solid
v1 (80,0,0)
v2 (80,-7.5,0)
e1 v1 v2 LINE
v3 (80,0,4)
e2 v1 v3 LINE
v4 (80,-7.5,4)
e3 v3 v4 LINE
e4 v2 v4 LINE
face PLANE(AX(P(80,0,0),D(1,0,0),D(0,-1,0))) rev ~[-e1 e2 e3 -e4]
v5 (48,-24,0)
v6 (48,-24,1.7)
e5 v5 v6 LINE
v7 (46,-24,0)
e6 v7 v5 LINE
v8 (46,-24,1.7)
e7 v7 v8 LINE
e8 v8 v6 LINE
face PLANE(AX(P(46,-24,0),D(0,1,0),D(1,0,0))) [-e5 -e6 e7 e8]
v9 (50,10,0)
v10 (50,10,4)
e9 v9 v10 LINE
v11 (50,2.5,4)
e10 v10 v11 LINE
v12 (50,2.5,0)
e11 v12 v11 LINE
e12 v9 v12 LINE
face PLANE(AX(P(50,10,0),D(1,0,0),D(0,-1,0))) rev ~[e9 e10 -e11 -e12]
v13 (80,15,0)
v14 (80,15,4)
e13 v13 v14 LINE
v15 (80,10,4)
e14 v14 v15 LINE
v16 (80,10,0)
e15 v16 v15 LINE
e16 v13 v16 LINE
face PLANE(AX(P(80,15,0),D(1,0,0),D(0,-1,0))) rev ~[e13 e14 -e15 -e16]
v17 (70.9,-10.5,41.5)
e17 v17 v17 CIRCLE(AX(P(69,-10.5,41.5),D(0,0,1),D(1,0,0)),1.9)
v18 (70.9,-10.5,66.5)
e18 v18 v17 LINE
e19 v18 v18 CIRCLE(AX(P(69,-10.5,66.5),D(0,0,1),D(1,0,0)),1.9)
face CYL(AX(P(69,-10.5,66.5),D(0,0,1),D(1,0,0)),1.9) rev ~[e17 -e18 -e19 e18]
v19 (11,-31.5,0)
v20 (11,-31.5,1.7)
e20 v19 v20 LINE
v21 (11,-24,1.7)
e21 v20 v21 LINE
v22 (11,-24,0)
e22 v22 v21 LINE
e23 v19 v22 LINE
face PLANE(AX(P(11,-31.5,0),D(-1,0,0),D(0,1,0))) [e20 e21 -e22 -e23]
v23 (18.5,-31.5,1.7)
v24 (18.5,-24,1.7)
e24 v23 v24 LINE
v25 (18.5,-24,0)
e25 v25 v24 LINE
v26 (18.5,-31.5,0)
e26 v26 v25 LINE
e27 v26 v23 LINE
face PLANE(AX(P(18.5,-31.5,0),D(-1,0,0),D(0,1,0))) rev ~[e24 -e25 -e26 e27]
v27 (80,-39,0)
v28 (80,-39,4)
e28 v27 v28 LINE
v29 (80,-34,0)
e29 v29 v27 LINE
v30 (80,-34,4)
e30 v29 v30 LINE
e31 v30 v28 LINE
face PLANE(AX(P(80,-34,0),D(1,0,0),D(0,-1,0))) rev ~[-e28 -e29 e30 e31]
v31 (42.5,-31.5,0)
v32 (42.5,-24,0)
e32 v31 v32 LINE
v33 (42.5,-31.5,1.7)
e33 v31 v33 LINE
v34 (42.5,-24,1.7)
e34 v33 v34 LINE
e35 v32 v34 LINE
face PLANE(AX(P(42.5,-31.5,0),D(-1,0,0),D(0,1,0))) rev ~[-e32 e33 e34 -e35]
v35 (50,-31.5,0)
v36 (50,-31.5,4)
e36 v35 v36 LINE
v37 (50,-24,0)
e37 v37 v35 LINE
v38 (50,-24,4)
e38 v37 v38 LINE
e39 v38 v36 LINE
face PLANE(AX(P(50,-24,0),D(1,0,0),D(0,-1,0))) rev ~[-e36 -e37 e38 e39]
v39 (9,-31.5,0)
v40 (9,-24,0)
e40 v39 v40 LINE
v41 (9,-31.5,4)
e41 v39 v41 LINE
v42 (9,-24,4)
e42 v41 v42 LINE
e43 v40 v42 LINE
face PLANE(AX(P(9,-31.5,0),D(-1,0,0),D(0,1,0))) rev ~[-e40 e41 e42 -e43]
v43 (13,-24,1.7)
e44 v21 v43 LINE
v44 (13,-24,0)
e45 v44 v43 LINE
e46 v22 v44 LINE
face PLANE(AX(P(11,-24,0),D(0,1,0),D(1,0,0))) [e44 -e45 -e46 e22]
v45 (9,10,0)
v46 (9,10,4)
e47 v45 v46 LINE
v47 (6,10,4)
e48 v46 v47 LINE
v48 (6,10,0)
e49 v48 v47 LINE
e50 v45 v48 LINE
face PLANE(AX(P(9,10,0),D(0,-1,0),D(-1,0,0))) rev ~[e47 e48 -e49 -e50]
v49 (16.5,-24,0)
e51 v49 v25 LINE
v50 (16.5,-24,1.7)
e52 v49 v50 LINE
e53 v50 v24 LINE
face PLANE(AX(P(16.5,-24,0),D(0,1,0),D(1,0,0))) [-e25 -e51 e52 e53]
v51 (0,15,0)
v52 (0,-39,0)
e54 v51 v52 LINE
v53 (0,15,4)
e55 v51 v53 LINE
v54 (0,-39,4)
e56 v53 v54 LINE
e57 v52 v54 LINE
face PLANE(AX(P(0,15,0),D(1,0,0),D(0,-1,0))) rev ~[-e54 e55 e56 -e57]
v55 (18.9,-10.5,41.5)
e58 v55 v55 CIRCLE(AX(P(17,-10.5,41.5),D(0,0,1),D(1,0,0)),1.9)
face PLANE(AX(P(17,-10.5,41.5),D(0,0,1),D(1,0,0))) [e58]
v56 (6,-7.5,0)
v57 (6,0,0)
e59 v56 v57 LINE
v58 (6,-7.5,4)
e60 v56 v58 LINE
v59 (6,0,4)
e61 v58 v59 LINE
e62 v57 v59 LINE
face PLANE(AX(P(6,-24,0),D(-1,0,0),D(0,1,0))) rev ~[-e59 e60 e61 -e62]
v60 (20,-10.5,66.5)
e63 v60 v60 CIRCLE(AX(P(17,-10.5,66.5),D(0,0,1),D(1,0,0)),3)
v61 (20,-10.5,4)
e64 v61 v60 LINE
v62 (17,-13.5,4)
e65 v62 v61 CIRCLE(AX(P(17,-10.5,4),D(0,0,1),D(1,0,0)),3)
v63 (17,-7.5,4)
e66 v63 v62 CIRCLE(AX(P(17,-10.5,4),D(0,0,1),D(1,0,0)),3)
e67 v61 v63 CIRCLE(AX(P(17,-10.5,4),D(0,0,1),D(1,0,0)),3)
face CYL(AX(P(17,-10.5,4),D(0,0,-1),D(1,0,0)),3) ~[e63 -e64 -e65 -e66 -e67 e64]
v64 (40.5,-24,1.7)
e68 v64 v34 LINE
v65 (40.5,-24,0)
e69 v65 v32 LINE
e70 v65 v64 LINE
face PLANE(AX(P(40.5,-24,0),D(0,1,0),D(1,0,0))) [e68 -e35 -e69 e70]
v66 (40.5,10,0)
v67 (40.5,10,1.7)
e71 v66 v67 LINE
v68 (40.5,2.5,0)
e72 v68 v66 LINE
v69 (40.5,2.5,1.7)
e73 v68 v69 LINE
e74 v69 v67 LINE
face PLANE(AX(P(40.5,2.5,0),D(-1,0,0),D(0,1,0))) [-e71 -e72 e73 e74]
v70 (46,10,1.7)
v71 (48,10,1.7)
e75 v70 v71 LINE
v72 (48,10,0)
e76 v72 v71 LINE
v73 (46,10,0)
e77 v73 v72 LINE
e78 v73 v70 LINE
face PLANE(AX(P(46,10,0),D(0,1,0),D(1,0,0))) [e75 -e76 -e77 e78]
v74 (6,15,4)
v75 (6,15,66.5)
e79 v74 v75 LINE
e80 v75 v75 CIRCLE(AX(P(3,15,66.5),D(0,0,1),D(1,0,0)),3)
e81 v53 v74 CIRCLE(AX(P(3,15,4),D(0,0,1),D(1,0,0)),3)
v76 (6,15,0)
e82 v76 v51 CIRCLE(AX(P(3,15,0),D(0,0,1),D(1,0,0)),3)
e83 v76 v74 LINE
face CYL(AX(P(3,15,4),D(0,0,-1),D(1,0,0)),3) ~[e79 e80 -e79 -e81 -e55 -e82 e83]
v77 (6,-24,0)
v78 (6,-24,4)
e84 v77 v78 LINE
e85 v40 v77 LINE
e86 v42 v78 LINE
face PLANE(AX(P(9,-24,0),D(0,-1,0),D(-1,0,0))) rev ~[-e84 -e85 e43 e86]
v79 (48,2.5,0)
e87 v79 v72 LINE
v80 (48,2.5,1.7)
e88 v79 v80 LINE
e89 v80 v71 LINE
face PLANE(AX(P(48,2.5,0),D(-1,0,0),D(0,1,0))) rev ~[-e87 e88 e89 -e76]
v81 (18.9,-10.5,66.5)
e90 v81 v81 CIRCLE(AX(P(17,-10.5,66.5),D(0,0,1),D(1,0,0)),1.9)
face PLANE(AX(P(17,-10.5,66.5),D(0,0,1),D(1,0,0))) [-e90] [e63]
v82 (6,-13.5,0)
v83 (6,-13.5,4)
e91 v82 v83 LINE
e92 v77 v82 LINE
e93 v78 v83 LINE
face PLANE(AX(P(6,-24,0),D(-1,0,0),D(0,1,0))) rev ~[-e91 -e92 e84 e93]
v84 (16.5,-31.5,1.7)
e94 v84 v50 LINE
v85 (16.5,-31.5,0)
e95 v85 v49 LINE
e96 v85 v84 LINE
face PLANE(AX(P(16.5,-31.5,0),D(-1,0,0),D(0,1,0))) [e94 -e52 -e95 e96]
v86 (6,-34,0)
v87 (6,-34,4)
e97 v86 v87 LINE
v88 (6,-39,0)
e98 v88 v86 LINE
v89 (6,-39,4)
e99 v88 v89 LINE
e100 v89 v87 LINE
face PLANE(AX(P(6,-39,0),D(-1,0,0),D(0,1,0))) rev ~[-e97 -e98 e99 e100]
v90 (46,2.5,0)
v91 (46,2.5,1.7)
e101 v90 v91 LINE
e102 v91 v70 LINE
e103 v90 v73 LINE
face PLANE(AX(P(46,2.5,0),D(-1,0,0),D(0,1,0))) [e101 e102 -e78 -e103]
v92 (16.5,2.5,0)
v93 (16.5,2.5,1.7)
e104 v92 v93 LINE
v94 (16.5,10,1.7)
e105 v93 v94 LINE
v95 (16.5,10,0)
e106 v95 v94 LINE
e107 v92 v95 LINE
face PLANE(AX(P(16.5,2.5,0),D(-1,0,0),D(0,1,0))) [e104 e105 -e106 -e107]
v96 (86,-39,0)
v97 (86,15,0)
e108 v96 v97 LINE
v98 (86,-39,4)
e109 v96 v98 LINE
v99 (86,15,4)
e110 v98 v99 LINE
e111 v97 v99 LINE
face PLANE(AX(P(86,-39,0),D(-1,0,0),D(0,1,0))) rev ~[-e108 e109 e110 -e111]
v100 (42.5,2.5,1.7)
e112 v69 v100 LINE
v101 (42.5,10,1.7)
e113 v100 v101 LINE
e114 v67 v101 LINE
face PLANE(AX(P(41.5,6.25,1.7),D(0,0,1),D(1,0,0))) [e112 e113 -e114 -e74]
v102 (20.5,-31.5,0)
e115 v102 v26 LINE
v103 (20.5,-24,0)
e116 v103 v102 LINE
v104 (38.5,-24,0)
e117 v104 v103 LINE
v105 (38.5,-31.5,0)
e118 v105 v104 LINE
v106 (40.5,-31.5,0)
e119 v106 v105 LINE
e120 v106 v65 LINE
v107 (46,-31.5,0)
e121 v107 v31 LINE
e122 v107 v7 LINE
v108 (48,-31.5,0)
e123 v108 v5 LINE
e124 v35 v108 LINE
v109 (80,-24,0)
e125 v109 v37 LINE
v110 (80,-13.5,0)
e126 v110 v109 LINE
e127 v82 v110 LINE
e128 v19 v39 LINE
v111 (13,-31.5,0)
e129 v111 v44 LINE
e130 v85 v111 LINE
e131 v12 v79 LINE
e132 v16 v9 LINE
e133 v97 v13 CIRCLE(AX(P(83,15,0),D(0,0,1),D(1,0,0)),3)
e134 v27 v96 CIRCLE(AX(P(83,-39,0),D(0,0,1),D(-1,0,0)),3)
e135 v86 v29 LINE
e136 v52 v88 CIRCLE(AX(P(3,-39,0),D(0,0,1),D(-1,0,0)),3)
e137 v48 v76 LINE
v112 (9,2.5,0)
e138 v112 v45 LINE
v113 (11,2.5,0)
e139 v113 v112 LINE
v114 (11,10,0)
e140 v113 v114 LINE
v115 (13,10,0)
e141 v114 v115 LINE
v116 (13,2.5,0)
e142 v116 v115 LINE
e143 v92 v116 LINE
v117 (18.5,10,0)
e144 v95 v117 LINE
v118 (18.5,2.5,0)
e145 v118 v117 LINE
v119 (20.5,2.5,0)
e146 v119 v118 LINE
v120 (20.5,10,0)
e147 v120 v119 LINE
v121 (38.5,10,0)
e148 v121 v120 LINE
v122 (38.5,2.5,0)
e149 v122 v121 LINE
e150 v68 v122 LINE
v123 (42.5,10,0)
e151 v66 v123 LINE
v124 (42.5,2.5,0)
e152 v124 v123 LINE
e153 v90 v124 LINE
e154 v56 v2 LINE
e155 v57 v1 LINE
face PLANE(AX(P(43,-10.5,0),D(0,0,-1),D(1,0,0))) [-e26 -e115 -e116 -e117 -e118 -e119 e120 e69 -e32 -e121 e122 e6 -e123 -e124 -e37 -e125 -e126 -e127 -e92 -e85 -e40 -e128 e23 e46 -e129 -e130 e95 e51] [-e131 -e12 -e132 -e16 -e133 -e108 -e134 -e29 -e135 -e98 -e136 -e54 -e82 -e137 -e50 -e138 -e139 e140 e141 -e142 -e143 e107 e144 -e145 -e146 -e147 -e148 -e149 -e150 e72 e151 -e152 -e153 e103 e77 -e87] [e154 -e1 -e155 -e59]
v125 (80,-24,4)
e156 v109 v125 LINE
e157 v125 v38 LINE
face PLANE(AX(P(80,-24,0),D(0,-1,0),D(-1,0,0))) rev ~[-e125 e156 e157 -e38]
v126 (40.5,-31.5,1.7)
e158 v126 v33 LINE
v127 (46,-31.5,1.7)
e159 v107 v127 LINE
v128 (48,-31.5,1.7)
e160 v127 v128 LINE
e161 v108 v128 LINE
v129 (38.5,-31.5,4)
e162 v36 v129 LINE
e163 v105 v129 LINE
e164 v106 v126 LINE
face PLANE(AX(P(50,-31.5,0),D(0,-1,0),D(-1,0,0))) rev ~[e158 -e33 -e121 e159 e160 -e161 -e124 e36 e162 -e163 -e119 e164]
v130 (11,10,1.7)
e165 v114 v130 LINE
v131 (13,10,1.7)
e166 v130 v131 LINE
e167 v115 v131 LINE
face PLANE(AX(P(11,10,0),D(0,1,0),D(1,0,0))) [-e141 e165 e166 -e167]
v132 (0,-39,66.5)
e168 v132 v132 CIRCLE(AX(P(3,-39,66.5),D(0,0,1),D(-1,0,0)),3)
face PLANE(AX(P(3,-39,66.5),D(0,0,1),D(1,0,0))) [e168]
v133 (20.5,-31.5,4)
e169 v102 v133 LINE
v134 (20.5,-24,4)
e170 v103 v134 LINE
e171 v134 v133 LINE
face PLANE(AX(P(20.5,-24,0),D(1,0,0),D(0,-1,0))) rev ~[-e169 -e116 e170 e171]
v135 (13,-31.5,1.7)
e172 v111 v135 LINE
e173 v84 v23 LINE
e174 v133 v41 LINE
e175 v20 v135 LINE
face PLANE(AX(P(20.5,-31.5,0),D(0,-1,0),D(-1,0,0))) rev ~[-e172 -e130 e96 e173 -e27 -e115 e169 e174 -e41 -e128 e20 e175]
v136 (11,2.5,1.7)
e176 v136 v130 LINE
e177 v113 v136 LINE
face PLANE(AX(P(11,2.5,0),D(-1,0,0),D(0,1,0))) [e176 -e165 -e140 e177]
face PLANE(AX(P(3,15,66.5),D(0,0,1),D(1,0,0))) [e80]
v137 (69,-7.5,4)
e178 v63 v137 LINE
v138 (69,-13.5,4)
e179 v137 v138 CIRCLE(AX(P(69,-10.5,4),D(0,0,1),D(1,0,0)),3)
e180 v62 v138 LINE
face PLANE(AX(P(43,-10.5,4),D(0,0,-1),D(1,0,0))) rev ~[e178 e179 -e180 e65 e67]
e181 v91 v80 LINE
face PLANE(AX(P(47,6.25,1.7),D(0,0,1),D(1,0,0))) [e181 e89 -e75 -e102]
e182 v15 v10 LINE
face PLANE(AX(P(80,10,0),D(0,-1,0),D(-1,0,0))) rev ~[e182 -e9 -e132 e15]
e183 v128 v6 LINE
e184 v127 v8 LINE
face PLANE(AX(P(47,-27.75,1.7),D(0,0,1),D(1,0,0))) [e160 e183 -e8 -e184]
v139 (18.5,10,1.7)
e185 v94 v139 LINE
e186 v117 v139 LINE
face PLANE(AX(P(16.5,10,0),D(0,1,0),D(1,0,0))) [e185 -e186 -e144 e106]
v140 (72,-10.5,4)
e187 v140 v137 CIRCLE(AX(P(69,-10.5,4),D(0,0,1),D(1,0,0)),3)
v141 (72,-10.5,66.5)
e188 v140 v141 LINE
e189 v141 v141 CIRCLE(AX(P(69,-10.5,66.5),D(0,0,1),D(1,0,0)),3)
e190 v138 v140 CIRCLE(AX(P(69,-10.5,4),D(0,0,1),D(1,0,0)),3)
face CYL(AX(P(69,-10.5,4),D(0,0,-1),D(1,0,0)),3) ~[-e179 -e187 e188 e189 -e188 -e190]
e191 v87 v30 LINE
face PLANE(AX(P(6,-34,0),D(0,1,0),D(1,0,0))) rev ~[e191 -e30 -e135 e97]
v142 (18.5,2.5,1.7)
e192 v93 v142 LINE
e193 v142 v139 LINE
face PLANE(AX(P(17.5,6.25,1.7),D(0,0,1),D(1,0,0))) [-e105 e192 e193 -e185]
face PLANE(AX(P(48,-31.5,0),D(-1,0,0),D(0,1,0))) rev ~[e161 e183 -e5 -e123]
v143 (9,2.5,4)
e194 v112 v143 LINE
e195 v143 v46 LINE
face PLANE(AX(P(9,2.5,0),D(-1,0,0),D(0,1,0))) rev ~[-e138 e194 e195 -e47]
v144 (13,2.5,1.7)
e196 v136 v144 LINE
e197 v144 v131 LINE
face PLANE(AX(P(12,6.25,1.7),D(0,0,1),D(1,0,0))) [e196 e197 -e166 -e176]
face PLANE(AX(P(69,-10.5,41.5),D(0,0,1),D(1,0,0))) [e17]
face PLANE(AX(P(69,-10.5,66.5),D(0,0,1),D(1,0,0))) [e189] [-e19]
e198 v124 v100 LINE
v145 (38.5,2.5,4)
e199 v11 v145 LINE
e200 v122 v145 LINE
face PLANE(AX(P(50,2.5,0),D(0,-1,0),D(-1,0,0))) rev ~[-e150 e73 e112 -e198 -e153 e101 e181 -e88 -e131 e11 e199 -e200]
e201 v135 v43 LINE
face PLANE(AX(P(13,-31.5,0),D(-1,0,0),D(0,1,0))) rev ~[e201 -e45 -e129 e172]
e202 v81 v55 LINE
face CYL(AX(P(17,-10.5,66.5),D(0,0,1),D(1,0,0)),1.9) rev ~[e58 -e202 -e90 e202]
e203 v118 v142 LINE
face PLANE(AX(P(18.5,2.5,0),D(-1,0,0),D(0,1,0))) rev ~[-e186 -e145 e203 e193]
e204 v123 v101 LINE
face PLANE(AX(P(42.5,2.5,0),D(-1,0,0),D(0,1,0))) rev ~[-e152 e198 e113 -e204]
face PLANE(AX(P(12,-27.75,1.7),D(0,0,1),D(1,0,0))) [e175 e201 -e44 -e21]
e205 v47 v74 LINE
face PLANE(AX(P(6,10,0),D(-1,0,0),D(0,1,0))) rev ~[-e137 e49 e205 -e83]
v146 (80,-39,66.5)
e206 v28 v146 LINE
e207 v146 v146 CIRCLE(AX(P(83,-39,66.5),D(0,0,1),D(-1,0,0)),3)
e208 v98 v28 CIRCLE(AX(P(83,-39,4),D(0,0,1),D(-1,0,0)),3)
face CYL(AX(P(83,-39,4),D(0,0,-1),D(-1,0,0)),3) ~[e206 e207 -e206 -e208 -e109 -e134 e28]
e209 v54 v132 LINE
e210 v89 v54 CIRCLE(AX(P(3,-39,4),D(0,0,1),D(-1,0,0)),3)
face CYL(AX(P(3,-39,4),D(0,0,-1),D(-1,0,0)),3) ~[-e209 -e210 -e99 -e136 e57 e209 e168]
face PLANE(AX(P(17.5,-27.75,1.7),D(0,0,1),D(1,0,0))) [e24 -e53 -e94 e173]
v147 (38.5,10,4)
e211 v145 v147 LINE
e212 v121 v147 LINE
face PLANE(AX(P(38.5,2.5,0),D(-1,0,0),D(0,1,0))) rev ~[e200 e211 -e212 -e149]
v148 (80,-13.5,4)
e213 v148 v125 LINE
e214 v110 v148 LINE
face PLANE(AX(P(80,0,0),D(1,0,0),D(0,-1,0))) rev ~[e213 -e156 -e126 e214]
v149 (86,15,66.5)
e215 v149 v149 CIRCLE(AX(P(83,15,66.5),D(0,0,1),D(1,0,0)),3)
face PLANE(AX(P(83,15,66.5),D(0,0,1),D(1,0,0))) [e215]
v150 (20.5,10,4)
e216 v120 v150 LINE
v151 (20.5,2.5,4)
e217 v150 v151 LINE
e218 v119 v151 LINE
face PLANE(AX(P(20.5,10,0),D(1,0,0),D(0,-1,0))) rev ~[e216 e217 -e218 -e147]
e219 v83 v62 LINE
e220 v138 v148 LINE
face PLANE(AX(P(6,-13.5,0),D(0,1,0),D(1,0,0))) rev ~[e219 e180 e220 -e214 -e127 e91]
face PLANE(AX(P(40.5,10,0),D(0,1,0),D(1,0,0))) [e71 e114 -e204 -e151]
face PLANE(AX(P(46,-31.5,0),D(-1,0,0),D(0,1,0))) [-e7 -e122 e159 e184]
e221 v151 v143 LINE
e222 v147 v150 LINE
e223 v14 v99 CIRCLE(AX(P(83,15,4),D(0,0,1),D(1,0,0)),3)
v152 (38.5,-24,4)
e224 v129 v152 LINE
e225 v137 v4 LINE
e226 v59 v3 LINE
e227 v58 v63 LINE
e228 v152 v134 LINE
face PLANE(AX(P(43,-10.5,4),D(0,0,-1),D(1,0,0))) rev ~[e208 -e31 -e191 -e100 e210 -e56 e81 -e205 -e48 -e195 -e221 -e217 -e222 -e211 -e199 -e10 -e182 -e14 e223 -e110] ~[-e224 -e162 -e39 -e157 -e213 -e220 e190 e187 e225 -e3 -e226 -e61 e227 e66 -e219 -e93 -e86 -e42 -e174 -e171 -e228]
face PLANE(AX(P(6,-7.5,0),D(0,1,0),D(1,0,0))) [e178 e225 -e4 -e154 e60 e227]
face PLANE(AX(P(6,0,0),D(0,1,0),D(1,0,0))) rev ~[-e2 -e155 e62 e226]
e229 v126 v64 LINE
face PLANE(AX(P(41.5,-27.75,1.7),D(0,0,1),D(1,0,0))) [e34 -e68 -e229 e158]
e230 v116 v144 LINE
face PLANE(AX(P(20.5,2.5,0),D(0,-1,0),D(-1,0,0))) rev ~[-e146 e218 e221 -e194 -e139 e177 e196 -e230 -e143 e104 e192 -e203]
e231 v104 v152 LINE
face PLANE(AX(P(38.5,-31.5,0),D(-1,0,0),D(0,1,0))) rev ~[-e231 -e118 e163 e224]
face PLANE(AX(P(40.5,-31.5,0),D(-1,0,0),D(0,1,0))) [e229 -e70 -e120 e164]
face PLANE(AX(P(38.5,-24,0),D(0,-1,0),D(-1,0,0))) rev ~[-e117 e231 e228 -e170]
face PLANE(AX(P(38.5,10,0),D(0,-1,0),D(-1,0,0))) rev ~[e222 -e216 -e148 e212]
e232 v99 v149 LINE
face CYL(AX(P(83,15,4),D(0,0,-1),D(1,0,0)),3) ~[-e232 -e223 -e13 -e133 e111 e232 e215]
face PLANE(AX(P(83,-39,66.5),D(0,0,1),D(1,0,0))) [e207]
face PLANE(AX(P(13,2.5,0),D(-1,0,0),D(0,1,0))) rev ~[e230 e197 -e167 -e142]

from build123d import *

# Parameters (mm, degrees)
F1_DEPTH  = 4
F2_W      = 2
F2_H      = 7.5
F3_DEPTH  = 1.7
F5_DEPTH  = 62.5
F4_R      = 3
F7_W      = 74
F7_H      = 6
F8_DEPTH  = 4
F9_R      = 1.9
F10_R     = 1.9
F11_DEPTH = 25


with BuildPart() as f1:
    # F0 (on Top) → F1 (new body)
    with BuildSketch(Plane.XY):
        with BuildLine():
            Line((6, 0), (80, 0))
            Line((80, 0), (80, -24))
            Line((80, -24), (80, -34))
            Line((80, -34), (80, -39))
            ThreePointArc((80, -39), (83, -42), (86, -39))
            Line((86, -39), (86, 15))
            ThreePointArc((86, 15), (83, 18), (80, 15))
            Line((80, 15), (80, 10))
            Line((80, 10), (50, 10))
            Line((50, 10), (50, 2.5))
            Line((50, 2.5), (38.5, 2.5))
            Line((38.5, 2.5), (38.5, 10))
            Line((38.5, 10), (20.5, 10))
            Line((20.5, 10), (20.5, 2.5))
            Line((20.5, 2.5), (9, 2.5))
            Line((9, 2.5), (9, 10))
            Line((9, 10), (6, 10))
            Line((6, 10), (6, 15))
            ThreePointArc((6, 15), (3, 18), (0, 15))
            Line((0, 15), (0, -39))
            ThreePointArc((0, -39), (3, -42), (6, -39))
            Line((6, -39), (6, -34))
            Line((6, -34), (6, -24))
            Line((6, -24), (6, 0))
        make_face()
        Polygon((80, -34), (80, -24), (50, -24), (50, -31.5), (38.5, -31.5), (38.5, -24), (20.5, -24), (20.5, -31.5), (9, -31.5), (9, -24), (6, -24), (6, -34), align=None)
    extrude(amount=F1_DEPTH)

    # F2 (on Top) → F3 (join)
    with BuildSketch(Plane.XY):
        with Locations((12, 6.25)):
            Rectangle(F2_W, F2_H)
        with Locations((17.5, 6.25)):
            Rectangle(F2_W, F2_H)
        with Locations((41.5, 6.25)):
            Rectangle(F2_W, F2_H)
        with Locations((47, 6.25)):
            Rectangle(F2_W, F2_H)
        with Locations((12, -27.75)):
            Rectangle(F2_W, F2_H)
        with Locations((17.5, -27.75)):
            Rectangle(F2_W, F2_H)
        with Locations((41.5, -27.75)):
            Rectangle(F2_W, F2_H)
        with Locations((47, -27.75)):
            Rectangle(F2_W, F2_H)
    extrude(amount=F3_DEPTH)

    # F4 (on face) → F5 (join)
    with BuildSketch(Plane.XY.offset(4)):
        with BuildLine():
            ThreePointArc((0, 15), (3, 12), (6, 15))
            ThreePointArc((6, 15), (3, 18), (0, 15))
        make_face()
        with BuildLine():
            ThreePointArc((6, -39), (3, -36), (0, -39))
            ThreePointArc((0, -39), (3, -42), (6, -39))
        make_face()
        with BuildLine():
            ThreePointArc((86, -39), (83, -36), (80, -39))
            ThreePointArc((80, -39), (83, -42), (86, -39))
        make_face()
        with BuildLine():
            ThreePointArc((80, 15), (83, 12), (86, 15))
            ThreePointArc((86, 15), (83, 18), (80, 15))
        make_face()
    extrude(amount=F5_DEPTH)



with BuildPart() as f5:
    # F4 (on face) → F5, piece 2 (new body)
    with BuildSketch(Plane.XY.offset(4)):
        with Locations((17, -10.5)):
            Circle(F4_R)
    extrude(amount=F5_DEPTH)


with BuildPart() as f5b:
    # F4 (on face) → F5, piece 3 (new body)
    with BuildSketch(Plane.XY.offset(4)):
        with Locations((69, -10.5)):
            Circle(F4_R)
    extrude(amount=F5_DEPTH)


with BuildPart() as f1_1:
    add(f1.part)

    add(f5.part)  # F8 merges F5

    add(f5b.part)  # F8 merges F5b
    # F7 (on face) → F8 (join)
    with BuildSketch(Plane(origin=(0, 0, 0), x_dir=(1, 0, 0), z_dir=(0, 0, -1))):
        with Locations((43, 10.5)):
            Rectangle(F7_W, F7_H)
    extrude(amount=-F8_DEPTH)

    # F9 (on face) + F10 (on face) → F11 (cut)
    with BuildSketch(Plane.XY.offset(66.5)):
        with Locations((17, -10.5)):
            Circle(F9_R)
    with BuildSketch(Plane.XY.offset(66.5)):
        with Locations((69, -10.5)):
            Circle(F10_R)
    extrude(amount=-F11_DEPTH, mode=Mode.SUBTRACT)


solid = f1_1.part
